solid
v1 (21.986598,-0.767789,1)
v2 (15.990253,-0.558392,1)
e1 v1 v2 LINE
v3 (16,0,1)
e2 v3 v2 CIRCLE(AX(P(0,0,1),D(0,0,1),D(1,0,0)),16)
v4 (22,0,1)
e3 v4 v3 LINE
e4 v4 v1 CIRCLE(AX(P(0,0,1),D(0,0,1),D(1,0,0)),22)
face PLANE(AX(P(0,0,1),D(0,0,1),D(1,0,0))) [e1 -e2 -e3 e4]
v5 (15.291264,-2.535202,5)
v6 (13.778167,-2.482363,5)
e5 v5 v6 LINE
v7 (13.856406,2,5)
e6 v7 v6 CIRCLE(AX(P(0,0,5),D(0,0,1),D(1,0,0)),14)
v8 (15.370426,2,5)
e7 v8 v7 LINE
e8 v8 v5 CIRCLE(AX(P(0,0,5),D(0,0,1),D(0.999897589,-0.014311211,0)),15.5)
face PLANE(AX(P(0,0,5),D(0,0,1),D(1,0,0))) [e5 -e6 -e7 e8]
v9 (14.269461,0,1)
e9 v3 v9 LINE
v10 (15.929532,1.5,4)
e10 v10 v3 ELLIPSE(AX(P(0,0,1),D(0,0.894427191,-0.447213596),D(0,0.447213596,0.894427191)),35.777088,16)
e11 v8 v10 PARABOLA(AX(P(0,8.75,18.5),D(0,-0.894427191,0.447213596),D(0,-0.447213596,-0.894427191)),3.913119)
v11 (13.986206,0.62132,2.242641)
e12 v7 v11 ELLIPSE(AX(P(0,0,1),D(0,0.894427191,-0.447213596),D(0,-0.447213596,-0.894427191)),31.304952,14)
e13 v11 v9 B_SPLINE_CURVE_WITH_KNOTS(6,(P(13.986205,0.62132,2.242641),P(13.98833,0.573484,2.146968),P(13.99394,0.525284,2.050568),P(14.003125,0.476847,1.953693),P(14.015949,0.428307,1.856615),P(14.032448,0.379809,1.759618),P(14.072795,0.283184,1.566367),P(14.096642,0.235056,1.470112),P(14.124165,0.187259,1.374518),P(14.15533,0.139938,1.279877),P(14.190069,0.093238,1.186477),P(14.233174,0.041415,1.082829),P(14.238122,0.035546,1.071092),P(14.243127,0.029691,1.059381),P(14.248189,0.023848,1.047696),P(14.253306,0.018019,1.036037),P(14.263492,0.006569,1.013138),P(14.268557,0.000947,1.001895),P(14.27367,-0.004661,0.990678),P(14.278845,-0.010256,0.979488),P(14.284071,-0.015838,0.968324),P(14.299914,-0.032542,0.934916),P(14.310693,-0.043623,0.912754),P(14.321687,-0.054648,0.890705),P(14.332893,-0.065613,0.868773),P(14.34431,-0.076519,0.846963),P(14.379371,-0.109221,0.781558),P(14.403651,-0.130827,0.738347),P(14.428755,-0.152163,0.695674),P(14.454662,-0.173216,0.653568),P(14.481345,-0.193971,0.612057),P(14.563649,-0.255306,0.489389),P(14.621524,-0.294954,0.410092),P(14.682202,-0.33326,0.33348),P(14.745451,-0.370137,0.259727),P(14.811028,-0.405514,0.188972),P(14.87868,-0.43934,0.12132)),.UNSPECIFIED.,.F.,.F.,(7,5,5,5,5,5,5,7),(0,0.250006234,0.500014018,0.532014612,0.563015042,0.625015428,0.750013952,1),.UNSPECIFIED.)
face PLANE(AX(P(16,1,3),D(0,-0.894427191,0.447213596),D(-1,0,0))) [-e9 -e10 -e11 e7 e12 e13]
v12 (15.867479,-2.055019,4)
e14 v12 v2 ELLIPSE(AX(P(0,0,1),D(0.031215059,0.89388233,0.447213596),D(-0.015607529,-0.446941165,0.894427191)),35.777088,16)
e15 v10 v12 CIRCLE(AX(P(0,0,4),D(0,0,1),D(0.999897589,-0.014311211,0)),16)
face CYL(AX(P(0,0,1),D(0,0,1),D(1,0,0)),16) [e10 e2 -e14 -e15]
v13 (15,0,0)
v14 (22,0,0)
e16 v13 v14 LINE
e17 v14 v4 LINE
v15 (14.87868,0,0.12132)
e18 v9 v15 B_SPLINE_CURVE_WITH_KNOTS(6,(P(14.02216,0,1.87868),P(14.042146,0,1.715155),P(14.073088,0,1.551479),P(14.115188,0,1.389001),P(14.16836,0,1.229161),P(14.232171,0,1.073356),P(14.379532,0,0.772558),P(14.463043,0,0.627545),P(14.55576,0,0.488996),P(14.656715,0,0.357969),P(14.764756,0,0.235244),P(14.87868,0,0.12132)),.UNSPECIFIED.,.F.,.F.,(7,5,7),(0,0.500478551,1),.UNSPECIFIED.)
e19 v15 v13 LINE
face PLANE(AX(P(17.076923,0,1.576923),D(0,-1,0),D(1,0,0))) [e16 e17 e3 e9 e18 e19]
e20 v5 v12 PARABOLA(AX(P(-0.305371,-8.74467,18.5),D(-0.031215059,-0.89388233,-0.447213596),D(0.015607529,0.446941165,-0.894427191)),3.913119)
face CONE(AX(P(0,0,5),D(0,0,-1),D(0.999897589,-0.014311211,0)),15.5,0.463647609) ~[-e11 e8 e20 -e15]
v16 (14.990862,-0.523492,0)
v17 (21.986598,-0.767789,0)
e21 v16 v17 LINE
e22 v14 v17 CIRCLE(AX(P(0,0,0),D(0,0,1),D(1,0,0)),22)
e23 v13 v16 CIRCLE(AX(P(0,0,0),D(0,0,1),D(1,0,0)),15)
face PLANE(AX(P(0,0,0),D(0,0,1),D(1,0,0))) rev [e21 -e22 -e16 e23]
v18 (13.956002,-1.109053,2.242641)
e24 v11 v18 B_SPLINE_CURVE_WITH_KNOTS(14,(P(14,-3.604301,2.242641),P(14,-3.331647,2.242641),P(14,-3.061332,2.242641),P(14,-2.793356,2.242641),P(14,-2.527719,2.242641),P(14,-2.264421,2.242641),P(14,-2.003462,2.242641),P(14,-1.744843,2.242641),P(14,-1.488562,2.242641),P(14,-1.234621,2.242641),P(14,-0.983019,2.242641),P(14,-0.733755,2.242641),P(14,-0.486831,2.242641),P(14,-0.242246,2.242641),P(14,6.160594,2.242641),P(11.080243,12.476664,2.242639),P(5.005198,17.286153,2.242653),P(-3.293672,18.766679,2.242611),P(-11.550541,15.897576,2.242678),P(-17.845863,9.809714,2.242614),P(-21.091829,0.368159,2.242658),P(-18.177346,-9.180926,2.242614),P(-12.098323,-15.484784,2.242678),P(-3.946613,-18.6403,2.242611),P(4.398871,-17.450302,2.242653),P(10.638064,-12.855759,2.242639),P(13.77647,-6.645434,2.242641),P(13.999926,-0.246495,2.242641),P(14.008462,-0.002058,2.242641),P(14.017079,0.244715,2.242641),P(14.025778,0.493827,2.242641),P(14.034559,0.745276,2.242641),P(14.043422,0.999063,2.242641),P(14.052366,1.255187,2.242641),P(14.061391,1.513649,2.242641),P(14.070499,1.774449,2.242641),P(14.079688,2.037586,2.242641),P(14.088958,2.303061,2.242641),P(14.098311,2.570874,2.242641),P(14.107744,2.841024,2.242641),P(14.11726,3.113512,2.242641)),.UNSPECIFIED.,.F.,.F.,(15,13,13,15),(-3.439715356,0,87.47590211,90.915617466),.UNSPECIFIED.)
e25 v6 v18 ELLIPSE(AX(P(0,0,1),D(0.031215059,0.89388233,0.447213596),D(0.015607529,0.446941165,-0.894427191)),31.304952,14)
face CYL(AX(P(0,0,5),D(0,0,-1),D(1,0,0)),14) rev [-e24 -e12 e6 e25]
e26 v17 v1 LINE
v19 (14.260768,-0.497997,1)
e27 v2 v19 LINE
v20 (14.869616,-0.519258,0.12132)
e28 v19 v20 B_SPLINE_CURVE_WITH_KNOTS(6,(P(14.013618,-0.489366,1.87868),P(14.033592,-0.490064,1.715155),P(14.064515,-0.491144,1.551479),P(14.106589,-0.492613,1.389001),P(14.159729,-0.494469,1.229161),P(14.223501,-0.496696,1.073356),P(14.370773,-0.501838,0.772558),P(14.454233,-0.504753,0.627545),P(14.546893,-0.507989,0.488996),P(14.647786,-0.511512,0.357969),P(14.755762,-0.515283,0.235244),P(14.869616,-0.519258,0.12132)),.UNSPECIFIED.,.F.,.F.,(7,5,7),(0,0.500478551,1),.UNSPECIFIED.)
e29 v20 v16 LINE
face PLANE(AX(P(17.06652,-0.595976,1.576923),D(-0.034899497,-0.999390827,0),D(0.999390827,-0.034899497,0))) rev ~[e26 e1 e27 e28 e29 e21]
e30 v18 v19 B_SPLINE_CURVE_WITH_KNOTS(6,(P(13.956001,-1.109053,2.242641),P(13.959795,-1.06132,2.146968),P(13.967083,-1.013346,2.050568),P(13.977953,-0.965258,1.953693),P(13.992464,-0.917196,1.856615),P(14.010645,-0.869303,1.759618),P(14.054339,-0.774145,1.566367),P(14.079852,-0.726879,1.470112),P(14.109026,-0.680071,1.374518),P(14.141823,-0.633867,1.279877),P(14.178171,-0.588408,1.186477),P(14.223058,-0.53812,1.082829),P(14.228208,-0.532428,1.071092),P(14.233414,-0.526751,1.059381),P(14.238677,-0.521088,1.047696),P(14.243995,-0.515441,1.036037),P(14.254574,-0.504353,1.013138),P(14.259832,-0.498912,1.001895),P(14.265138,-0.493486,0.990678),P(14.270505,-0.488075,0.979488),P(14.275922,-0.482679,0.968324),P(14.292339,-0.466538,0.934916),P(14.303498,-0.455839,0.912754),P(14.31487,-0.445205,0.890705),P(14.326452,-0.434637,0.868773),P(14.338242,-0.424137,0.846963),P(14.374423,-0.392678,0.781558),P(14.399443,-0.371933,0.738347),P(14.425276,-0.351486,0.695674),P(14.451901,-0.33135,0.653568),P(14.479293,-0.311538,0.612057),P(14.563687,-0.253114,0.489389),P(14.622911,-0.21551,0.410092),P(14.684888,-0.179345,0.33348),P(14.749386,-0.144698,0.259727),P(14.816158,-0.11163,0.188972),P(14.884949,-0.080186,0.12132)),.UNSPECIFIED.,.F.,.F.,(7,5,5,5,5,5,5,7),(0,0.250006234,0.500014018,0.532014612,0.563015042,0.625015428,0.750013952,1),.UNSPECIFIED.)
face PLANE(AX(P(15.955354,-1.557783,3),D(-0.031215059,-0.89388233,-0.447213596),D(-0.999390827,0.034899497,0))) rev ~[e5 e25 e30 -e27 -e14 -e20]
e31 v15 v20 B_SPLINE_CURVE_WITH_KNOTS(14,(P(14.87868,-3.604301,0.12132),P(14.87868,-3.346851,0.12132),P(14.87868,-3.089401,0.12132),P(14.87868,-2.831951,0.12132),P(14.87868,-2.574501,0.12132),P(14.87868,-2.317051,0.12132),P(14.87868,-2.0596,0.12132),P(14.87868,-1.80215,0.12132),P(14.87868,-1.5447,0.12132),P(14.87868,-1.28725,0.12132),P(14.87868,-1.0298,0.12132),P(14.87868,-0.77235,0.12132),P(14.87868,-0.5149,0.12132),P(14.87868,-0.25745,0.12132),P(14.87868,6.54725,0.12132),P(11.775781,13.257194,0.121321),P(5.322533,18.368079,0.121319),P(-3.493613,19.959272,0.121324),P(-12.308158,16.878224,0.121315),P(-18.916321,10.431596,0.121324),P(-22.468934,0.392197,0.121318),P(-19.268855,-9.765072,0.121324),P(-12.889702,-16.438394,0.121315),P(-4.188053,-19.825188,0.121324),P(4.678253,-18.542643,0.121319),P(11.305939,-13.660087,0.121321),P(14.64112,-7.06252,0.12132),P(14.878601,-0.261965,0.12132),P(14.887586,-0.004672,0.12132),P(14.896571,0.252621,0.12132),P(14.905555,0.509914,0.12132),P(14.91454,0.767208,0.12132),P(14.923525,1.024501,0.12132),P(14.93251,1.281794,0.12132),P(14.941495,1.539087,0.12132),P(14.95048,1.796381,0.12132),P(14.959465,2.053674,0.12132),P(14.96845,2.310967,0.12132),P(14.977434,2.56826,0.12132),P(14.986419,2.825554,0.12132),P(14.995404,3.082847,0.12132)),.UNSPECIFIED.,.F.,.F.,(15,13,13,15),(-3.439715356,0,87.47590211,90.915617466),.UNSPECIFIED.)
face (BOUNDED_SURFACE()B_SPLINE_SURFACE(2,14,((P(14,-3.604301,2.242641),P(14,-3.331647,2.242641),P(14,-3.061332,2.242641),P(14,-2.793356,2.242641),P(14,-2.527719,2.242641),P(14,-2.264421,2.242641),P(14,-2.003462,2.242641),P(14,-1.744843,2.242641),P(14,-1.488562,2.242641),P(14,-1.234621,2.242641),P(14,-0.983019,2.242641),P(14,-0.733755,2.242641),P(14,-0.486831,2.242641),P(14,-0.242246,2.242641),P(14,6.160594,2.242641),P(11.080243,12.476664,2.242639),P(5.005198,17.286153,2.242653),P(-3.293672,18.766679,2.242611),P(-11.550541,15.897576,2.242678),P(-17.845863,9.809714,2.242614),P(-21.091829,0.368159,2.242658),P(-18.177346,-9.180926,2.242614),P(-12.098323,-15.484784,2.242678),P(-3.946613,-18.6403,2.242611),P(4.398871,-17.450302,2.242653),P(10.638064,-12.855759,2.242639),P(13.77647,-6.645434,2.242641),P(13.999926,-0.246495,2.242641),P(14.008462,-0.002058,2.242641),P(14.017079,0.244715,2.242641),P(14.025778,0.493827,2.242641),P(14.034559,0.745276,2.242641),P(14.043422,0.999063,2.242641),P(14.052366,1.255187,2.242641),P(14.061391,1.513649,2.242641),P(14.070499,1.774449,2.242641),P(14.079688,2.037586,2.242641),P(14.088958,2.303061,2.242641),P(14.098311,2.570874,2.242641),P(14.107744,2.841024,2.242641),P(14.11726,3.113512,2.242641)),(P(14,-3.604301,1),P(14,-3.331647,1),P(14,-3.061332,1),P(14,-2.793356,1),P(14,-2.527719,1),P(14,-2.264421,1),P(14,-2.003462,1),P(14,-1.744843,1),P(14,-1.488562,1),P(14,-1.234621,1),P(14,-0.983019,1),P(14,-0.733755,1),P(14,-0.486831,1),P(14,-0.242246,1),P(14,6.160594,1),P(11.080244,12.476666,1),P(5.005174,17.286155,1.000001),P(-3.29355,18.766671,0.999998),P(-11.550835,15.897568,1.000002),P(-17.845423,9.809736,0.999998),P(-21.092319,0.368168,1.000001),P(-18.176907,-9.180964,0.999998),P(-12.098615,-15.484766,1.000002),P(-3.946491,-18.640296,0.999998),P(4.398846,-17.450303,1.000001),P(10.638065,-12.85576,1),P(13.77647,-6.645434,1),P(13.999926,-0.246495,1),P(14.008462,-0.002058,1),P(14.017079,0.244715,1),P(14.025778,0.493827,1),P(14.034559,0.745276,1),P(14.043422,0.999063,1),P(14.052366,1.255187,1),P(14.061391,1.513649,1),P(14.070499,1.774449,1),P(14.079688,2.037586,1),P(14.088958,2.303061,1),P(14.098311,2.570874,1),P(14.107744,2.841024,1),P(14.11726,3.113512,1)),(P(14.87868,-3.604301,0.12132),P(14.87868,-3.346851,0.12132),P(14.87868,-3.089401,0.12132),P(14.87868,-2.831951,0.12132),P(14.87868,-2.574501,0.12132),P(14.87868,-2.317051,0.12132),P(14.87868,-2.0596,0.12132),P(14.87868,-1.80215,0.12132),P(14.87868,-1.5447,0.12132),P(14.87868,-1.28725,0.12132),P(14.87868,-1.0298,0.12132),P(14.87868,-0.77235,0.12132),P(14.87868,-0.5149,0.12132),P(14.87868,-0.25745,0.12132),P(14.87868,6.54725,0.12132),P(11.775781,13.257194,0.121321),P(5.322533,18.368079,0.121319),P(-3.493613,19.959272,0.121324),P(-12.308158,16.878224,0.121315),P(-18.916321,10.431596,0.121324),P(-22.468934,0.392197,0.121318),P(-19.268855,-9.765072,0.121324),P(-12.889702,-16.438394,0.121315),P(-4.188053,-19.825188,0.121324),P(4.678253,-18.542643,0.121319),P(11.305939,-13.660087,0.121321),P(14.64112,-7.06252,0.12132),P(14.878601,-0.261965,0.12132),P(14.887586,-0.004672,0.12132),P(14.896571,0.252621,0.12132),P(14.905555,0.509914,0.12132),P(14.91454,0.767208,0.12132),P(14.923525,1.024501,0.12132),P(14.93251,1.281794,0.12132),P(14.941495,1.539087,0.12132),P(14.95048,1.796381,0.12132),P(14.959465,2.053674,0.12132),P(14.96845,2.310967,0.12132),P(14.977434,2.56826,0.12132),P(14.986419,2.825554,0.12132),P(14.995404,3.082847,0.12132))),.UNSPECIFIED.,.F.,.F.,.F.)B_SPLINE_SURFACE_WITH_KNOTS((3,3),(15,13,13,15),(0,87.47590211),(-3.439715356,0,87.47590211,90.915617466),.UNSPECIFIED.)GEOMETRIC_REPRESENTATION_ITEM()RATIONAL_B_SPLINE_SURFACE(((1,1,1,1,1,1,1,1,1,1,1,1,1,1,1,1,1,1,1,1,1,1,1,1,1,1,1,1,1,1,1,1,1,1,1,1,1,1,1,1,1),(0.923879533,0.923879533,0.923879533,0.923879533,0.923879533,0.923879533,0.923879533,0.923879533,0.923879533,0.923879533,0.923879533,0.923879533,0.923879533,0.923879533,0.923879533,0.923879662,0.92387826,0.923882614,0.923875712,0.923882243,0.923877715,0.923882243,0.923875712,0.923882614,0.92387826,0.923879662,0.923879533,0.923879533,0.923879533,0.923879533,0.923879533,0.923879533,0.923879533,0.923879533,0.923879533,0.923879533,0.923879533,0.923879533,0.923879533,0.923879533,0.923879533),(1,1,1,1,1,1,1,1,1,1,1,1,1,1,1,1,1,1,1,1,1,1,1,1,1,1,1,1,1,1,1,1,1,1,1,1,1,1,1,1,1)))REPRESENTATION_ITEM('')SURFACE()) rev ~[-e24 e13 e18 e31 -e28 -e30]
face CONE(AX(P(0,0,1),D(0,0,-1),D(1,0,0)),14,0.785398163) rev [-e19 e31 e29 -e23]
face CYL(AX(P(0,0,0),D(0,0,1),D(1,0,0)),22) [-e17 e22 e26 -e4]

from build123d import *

# Parameters (mm, degrees)
F1_ANGLE    = 358
F2_C1_SIZE2 = 4
F2_C1_SIZE  = 2
F2_C2_SIZE2 = 4
F2_C2_SIZE  = 2
F3_SIZE     = 1
F4_R        = 3
F5_T2_ANGLE = 359.64


# Not quite as in the source:
# - a fillet or chamfer that OpenCascade refuses, or shapes differently, is made with other operations: its cross-section is extruded or revolved along the edge and cut away or added


with BuildPart() as f1:
    # F0 (on Front) → F1 (revolve)
    with BuildSketch(Plane.XZ):
        Polygon((14, 0), (22, 0), (22, 1), (16, 1), (16, 5), (14, 5), align=None)
    revolve(axis=Axis((0, 0, -0.0525576656), (0, 0, 1)), revolution_arc=F1_ANGLE)

    # F2: chamfer of 4 x 2 on 2 edges, made by hand

    # F2_c1
    f2_c1_edges = [f1.edges().sort_by_distance(p)[0] for p in [
        (15, 0, 5),
    ]]
    f2_c1_side = f1.faces().sort_by_distance((15, 0.04, 5))[0]
    chamfer(f2_c1_edges, length=F2_C1_SIZE, length2=F2_C1_SIZE2, reference=f2_c1_side)

    # F2_c2
    f2_c2_edges = [f1.edges().sort_by_distance(p)[0] for p in [
        (14.9908624053, -0.5234924505, 5),
    ]]
    f2_c2_side = f1.faces().sort_by_distance((14.9894664254, -0.5634680836, 5))[0]
    chamfer(f2_c2_edges, length=F2_C2_SIZE, length2=F2_C2_SIZE2, reference=f2_c2_side)

    # F3
    f3_edges = [f1.edges().sort_by_distance(p)[0] for p in [
        (-13.997868, 0.244334, 0),
    ]]
    chamfer(f3_edges, length=F3_SIZE)

    # F4
    f4_edges = [f1.edges().sort_by_distance(p)[0] for p in [
        (-13.997868, 0.244334, 1),
    ]]
    fillet(f4_edges, radius=F4_R)

    # F5: chamfer of 1 x 0.5 on 1 edges, made by hand

    # F5_s1 → F5_t2 (revolve, cut)
    with BuildSketch(Plane(origin=(0, 0, 0), x_dir=(0, 0, 1), z_dir=(-0.0143112113, -0.9998975894, 0))):
        Polygon((5, -15.5), (4, -16), (5, -16), align=None)
    revolve(axis=Axis((0, 0, 5), (0, 0, 1)), revolution_arc=F5_T2_ANGLE, mode=Mode.SUBTRACT)


solid = f1.part
